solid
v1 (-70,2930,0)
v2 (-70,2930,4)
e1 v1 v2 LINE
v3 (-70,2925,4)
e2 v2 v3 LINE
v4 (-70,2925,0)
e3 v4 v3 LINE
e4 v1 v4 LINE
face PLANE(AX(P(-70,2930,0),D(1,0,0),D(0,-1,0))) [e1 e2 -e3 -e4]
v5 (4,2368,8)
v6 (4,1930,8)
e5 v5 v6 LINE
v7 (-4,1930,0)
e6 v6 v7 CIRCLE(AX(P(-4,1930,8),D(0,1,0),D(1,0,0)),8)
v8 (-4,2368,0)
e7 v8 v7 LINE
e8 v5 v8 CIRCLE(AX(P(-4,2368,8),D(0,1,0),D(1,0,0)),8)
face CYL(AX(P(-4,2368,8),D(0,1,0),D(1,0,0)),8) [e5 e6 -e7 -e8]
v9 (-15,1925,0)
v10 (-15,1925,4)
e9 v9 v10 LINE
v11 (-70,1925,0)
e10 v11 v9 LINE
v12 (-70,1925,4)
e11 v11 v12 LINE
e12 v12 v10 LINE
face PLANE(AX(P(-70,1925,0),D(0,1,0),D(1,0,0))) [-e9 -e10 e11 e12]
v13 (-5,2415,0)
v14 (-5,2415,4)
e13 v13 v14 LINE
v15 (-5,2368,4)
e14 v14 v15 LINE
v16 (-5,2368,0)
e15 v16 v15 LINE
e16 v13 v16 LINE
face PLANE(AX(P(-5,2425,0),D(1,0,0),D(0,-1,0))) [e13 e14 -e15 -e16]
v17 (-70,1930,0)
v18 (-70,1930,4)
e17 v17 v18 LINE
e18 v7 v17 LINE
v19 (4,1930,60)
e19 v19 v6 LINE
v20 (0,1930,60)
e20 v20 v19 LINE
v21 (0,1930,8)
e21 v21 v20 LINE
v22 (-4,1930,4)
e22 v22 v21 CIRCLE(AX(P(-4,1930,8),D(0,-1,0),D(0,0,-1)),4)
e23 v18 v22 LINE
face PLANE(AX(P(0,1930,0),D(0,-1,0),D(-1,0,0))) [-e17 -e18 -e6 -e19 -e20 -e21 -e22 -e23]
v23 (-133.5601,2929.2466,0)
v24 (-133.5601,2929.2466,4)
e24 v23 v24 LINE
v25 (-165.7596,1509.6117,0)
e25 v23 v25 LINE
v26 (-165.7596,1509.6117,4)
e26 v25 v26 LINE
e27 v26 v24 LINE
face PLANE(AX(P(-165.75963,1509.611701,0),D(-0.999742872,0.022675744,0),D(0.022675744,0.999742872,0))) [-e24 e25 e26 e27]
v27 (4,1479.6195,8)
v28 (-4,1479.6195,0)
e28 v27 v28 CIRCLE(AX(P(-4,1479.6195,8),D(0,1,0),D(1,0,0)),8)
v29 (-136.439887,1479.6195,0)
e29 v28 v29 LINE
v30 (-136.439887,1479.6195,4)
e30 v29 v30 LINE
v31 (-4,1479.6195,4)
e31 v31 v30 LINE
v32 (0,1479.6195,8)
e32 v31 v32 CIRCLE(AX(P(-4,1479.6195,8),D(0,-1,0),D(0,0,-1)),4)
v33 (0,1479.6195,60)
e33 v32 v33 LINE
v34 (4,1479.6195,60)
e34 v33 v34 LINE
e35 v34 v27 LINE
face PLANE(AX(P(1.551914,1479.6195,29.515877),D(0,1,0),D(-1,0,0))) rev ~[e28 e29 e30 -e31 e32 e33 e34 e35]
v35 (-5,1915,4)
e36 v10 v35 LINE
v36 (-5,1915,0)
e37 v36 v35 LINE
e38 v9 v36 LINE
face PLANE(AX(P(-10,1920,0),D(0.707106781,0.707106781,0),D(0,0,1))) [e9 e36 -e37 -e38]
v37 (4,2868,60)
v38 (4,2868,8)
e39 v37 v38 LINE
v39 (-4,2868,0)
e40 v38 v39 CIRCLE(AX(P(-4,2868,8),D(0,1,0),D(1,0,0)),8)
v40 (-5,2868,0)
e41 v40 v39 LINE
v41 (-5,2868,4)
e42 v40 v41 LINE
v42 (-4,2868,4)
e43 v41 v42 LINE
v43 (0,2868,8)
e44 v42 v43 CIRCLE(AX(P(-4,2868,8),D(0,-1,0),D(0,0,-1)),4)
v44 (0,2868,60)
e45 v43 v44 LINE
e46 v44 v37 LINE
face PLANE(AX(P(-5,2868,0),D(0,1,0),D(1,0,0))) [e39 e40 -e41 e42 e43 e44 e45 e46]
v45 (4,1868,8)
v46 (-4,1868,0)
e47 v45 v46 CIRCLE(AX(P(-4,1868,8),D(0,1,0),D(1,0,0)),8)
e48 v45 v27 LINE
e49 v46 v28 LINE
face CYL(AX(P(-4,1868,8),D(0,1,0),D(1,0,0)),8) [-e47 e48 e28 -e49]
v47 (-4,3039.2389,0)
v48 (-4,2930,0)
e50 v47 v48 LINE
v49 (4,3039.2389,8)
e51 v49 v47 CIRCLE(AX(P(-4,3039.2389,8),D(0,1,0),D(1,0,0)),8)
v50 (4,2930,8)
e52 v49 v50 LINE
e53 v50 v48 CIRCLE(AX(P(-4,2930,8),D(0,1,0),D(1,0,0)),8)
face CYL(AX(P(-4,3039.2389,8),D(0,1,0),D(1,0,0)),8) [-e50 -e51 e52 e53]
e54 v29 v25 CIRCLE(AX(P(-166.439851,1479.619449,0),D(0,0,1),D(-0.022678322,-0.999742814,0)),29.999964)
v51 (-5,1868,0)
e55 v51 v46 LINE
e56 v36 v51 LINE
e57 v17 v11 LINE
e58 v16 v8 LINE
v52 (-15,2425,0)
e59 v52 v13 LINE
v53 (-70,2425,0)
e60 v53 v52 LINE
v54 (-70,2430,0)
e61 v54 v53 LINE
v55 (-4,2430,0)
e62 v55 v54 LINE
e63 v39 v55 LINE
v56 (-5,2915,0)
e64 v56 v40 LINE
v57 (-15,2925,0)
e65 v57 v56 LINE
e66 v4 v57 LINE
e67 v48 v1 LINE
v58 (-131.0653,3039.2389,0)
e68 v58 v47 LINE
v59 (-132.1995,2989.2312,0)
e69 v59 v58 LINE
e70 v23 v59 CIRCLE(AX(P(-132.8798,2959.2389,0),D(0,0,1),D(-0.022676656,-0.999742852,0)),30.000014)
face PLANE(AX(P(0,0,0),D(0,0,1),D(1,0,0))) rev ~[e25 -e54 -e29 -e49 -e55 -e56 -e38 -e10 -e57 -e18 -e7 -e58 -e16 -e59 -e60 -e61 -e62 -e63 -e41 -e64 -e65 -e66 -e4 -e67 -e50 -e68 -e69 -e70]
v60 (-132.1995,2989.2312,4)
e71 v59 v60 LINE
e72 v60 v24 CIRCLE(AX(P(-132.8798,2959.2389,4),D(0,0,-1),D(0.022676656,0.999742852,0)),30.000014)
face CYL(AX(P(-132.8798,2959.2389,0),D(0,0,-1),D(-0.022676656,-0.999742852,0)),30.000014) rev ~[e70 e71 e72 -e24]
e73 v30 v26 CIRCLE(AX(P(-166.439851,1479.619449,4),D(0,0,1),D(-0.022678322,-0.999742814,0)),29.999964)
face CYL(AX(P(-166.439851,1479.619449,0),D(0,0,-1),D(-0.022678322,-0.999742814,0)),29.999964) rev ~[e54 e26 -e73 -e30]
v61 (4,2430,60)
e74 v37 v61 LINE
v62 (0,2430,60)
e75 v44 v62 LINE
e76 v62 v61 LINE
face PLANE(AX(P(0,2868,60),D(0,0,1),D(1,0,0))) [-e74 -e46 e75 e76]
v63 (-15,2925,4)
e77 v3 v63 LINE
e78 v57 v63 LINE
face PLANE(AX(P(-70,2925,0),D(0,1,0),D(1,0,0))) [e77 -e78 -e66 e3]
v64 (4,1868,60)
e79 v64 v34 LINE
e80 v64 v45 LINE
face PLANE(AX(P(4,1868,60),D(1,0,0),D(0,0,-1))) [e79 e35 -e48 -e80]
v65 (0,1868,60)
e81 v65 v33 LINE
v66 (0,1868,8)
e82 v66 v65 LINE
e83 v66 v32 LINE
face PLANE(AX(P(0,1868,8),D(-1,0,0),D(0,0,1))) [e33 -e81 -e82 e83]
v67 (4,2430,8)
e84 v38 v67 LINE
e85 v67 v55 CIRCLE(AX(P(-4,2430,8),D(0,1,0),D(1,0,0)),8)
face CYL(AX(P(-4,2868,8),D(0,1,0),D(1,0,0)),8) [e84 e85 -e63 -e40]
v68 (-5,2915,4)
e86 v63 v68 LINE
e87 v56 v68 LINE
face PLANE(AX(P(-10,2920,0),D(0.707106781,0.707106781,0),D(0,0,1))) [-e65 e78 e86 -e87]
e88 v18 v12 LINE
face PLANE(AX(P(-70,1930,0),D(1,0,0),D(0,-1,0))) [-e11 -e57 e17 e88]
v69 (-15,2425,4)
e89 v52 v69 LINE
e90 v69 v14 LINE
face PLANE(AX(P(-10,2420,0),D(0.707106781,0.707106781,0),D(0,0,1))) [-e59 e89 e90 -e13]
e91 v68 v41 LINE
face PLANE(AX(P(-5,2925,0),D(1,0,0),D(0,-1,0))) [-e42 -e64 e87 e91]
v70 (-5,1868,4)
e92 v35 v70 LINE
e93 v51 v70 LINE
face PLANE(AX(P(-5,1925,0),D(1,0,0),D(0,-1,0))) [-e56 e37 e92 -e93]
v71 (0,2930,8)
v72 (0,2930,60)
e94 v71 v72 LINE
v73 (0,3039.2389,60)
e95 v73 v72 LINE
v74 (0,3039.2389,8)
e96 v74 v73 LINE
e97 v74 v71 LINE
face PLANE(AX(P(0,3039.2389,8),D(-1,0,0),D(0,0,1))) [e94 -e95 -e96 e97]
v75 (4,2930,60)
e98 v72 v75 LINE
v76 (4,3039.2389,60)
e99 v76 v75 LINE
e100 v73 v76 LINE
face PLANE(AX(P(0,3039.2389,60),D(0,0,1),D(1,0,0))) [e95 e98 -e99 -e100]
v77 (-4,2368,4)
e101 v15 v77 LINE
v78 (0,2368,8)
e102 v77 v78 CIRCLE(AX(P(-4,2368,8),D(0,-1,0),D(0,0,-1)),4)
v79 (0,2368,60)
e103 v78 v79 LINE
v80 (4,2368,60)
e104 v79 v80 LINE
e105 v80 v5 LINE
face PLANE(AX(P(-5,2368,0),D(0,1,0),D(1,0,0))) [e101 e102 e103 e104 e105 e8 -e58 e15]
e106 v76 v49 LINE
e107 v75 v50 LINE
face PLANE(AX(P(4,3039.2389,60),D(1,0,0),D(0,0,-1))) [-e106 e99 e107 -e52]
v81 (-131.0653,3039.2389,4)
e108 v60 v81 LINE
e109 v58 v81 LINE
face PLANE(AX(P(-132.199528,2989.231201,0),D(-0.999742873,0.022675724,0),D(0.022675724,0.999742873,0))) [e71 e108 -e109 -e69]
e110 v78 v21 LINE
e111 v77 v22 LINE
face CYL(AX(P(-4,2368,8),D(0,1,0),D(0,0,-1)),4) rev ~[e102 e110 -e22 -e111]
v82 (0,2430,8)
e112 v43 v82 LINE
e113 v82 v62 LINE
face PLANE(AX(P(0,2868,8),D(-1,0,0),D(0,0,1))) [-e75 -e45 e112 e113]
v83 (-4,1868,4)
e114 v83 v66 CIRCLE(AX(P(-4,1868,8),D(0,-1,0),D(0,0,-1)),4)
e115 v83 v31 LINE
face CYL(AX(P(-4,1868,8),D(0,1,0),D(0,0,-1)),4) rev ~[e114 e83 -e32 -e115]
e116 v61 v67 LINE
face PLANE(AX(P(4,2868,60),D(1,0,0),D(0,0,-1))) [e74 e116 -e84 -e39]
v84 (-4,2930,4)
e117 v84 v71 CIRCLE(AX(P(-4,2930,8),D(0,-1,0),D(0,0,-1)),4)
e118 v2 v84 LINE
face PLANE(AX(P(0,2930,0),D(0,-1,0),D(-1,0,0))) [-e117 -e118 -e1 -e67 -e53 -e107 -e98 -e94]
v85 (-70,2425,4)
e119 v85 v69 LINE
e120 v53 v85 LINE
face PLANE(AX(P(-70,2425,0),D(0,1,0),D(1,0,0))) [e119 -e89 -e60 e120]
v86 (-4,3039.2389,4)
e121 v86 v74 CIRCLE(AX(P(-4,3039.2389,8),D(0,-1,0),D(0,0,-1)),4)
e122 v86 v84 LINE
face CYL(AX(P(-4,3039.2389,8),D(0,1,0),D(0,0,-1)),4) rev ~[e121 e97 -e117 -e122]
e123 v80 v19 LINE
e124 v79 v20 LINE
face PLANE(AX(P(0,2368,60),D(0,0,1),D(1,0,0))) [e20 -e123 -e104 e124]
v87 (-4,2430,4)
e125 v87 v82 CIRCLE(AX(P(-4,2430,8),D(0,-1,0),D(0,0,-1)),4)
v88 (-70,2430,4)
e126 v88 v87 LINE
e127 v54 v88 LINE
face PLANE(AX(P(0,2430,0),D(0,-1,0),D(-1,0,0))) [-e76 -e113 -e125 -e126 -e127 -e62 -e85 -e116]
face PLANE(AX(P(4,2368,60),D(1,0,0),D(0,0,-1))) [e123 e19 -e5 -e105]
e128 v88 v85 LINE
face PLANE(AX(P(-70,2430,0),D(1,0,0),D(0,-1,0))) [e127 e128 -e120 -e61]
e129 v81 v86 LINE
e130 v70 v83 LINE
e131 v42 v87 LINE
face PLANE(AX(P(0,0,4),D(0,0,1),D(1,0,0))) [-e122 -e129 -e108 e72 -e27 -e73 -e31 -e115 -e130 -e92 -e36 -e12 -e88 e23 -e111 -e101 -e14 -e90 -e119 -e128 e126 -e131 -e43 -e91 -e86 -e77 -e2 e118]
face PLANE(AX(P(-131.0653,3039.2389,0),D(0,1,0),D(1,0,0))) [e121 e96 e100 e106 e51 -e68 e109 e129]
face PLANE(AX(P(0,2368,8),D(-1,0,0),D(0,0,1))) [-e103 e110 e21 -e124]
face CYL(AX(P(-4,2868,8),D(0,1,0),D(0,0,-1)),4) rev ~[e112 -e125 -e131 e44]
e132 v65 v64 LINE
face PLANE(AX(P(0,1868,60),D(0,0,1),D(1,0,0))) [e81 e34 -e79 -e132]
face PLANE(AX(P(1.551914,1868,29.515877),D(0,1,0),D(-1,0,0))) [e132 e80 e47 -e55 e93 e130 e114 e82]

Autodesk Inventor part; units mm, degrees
ref_plane "YZ Plane" through (0, 0, 0) normal (1, 0, 0) x (0, 1, 0)
ref_plane "XZ Plane" through (0, 0, 0) normal (0, 1, 0) x (-1, 0, 0)
ref_plane "XY Plane" through (0, 0, 0) normal (0, 0, 1) x (1, 0, 0)
sketch "Sketch1" plane through (0, 0, 0) normal (0, 0, 1) x (1, 0, 0)
  line L0 (0, 0) -> (0, 1479.6195)
  line L1 (0, 1479.6195) -> (-166.4399, 1479.6195)
  line L2 (-166.4399, 1479.6195) -> (-200, 0)
  line L3 (-200, 0) -> (0, 0)
  line L4 (0, 430) -> (-5, 430)
  line L5 (-5, 430) -> (-5, 368)
  line L6 (-5, 368) -> (0, 368)
  line L7 (0, 368) -> (0, 430)
  line L8 (-5, 430) -> (-70, 430)
  line L9 (-70, 430) -> (-70, 425)
  line L10 (-70, 425) -> (-5, 425)
  line L11 (-5, 425) -> (-5, 430)
  line L12 (-70, 430) -> (-190.2469, 430) construction
  line L13 (0, 4408.8661) -> (0, 1479.6195)
  line L14 (-166.4399, 1479.6195) -> (-132.8798, 2959.2389)
  line L15 (0, 4408.8661) -> (-100, 4408.8661)
  line L16 (-132.8798, 2959.2389) -> (0, 2959.2389)
  line L17 (-132.8798, 2959.2389) -> (-100, 4408.8661)
  line L18 (-5, 868) -> (0, 868)
  line L19 (-70, 925) -> (-5, 925)
  line L20 (-5, 930) -> (-70, 930)
  line L21 (-70, 930) -> (-70, 925)
  line L22 (-5, 925) -> (-5, 930)
  line L23 (-5, 930) -> (-5, 868)
  line L24 (0, 868) -> (0, 930)
  line L25 (0, 930) -> (-5, 930)
  line L26 (-5, 1368) -> (0, 1368)
  line L27 (-70, 1425) -> (-5, 1425)
  line L28 (-5, 1430) -> (-70, 1430)
  line L29 (-70, 1430) -> (-70, 1425)
  line L30 (-5, 1425) -> (-5, 1430)
  line L31 (-5, 1430) -> (-5, 1368)
  line L32 (0, 1368) -> (0, 1430)
  line L33 (0, 1430) -> (-5, 1430)
  line L34 (-5, 1868) -> (0, 1868)
  line L35 (-70, 1925) -> (-5, 1925)
  line L36 (-5, 1930) -> (-70, 1930)
  line L37 (-70, 1930) -> (-70, 1925)
  line L38 (-5, 1925) -> (-5, 1930)
  line L39 (-5, 1930) -> (-5, 1868)
  line L40 (0, 1868) -> (0, 1930)
  line L41 (0, 1930) -> (-5, 1930)
  line L42 (-5, 2368) -> (0, 2368)
  line L43 (-70, 2425) -> (-5, 2425)
  line L44 (-5, 2430) -> (-70, 2430)
  line L45 (-70, 2430) -> (-70, 2425)
  line L46 (-5, 2425) -> (-5, 2430)
  line L47 (-5, 2430) -> (-5, 2368)
  line L48 (0, 2368) -> (0, 2430)
  line L49 (0, 2430) -> (-5, 2430)
  line L50 (-5, 2868) -> (0, 2868)
  line L51 (-70, 2925) -> (-5, 2925)
  line L52 (-5, 2930) -> (-70, 2930)
  line L53 (-70, 2930) -> (-70, 2925)
  line L54 (-5, 2925) -> (-5, 2930)
  line L55 (-5, 2930) -> (-5, 2868)
  line L56 (0, 2868) -> (0, 2930)
  line L57 (0, 2930) -> (-5, 2930)
  line L58 (-100, 4408.8661) -> (-99.3197, 4438.8584) construction
  line L59 (0, 1629.6195) -> (-163.0377, 1629.6195)
  line L60 (-131.0653, 3039.2389) -> (0, 3039.2389)
  line L61 (-5, 3368) -> (0, 3368)
  line L62 (-70, 3425) -> (-5, 3425)
  line L63 (-5, 3430) -> (-70, 3430)
  line L64 (-70, 3430) -> (-70, 3425)
  line L65 (-5, 3425) -> (-5, 3430)
  line L66 (-5, 3430) -> (-5, 3368)
  line L67 (0, 3368) -> (0, 3430)
  line L68 (0, 3430) -> (-5, 3430)
  line L69 (-5, 3868) -> (0, 3868)
  line L70 (-70, 3925) -> (-5, 3925)
  line L71 (-5, 3930) -> (-70, 3930)
  line L72 (-70, 3930) -> (-70, 3925)
  line L73 (-5, 3925) -> (-5, 3930)
  line L74 (-5, 3930) -> (-5, 3868)
  line L75 (0, 3868) -> (0, 3930)
  line L76 (0, 3930) -> (-5, 3930)
  arc A0 (-140, 0) -> (-198.6395, 59.9846) centre (-200, 0) ccw
  arc A1 (-167.1202, 1449.6272) -> (-165.7596, 1509.6117) centre (-166.4399, 1479.6195) ccw
  arc A2 (-133.5601, 2929.2466) -> (-132.1995, 2989.2312) centre (-132.8798, 2959.2389) ccw
  line L77 (0, 930) -> (-70, 930)
  line L78 (-70, 930) -> (-178.9061, 930) construction
  line L79 (-70, 1430) -> (-167.5654, 1430) construction
  line L80 (-70, 1930) -> (-156.2246, 1930) construction
  line L81 (-70, 2430) -> (-144.8838, 2430) construction
  line L82 (-70, 2930) -> (-133.543, 2930) construction
  line L83 (-70, 3430) -> (-122.2022, 3430) construction
  line L84 (-70, 3930) -> (-110.8614, 3930) construction
  point P0 (0, 430)
  point P1 (-136.4399, 1479.6195)
  dimension "d25" = 430
  dimension "d32" = 1480
  dimension "d33" = 1480
  dimension "d34" = 1450
  dimension "d35" = 100
  dimension "d38" = 500
  dimension "d44" = 30
  dimension "d45" = 150
  dimension "d46" = 80
  dimension "d47" = 200
  dimension "d48" = 5
  dimension "d50" = 62
  dimension "d51" = 60
  dimension "d52" = 30
  dimension "d53" = 478.8661
  dimension "d54" = 30
  dimension "d56" = 190.2469
  dimension "d57" = 178.9061
  dimension "d58" = 167.5654
  dimension "d59" = 156.2246
  dimension "d60" = 144.8838
  dimension "d61" = 133.543
  dimension "d62" = 122.2022
  dimension "d63" = 110.8614
  dimension "d64" = 70
extrude "Plate1" add sketch "Sketch1" along normal blind 4 contours A1 L14 L59 L13 L1 | L14 A2 L16 L13 L57 L52 L53 L51 L55 L50 L49 L44 L45 L43 L47 L42 L41 L36 L37 L35 L39 L34 L59 | A2 L17 L60 L13 L16
sketch "Sketch2" plane through (4, 1479.6195, 0) normal (-1, 0, 0) x (0, -1, 0)
  line L0 (-388.3805, 0) -> (0, 0)
  line L1 (0, 0) -> (0, -60)
  line L2 (0, -60) -> (-388.3805, -60)
  line L3 (-388.3805, -60) -> (-388.3805, 0)
edge flange "Flange1" height 60 angle 90 thickness 4 bend radius 4 thickness toward (-1, 0, 0) relief tear relief width 4 relief depth 2 corner gap 4 corner form 0 edges at (0, 1673.8097, 0) (0, 2149, 0) (0, 2649, 0) (0, 2984.6195, 0) wall of the first edge with corners at (4, 1868, 0) (4, 1479.6195, 0) (4, 1479.6195, 60) (4, 1868, 60)
bend "Bend1"
corner "Corner1"
chamfer "Corner Chamfer1" distance 10 angle 45 3 edges at (-5, 1925, 2) (-5, 2425, 2) (-5, 2925, 2)
equation "\"d5\" = Thickness"
equation "\"d7\" = BendReliefWidth"
equation "\"d8\" = BendReliefDepth"
equation "\"d9\" = MinimumRemnant"
equation "\"d10\" = TransitionRadius"
equation "\"d13\" = BendRadius"
equation "\"d14\" = CornerReliefSize"
equation "\"d15\" = GapSize"
equation "\"d16\" = JacobiRadiusSize"
equation "\"BendRadius\" = Thickness"
equation "\"BendReliefWidth\" = Thickness"
equation "\"BendReliefDepth\" = 0.5 * Thickness"
equation "\"CornerReliefSize\" = 4 * Thickness"
equation "\"MinimumRemnant\" = 2 * Thickness"
equation "\"TransitionRadius\" = BendRadius"
equation "\"JacobiRadiusSize\" = BendRadius"
equation "\"GapSize\" = Thickness"
equation "\"Thickness\" = 4"
properties part number "GBK 0201 second rib" material "Steel"
